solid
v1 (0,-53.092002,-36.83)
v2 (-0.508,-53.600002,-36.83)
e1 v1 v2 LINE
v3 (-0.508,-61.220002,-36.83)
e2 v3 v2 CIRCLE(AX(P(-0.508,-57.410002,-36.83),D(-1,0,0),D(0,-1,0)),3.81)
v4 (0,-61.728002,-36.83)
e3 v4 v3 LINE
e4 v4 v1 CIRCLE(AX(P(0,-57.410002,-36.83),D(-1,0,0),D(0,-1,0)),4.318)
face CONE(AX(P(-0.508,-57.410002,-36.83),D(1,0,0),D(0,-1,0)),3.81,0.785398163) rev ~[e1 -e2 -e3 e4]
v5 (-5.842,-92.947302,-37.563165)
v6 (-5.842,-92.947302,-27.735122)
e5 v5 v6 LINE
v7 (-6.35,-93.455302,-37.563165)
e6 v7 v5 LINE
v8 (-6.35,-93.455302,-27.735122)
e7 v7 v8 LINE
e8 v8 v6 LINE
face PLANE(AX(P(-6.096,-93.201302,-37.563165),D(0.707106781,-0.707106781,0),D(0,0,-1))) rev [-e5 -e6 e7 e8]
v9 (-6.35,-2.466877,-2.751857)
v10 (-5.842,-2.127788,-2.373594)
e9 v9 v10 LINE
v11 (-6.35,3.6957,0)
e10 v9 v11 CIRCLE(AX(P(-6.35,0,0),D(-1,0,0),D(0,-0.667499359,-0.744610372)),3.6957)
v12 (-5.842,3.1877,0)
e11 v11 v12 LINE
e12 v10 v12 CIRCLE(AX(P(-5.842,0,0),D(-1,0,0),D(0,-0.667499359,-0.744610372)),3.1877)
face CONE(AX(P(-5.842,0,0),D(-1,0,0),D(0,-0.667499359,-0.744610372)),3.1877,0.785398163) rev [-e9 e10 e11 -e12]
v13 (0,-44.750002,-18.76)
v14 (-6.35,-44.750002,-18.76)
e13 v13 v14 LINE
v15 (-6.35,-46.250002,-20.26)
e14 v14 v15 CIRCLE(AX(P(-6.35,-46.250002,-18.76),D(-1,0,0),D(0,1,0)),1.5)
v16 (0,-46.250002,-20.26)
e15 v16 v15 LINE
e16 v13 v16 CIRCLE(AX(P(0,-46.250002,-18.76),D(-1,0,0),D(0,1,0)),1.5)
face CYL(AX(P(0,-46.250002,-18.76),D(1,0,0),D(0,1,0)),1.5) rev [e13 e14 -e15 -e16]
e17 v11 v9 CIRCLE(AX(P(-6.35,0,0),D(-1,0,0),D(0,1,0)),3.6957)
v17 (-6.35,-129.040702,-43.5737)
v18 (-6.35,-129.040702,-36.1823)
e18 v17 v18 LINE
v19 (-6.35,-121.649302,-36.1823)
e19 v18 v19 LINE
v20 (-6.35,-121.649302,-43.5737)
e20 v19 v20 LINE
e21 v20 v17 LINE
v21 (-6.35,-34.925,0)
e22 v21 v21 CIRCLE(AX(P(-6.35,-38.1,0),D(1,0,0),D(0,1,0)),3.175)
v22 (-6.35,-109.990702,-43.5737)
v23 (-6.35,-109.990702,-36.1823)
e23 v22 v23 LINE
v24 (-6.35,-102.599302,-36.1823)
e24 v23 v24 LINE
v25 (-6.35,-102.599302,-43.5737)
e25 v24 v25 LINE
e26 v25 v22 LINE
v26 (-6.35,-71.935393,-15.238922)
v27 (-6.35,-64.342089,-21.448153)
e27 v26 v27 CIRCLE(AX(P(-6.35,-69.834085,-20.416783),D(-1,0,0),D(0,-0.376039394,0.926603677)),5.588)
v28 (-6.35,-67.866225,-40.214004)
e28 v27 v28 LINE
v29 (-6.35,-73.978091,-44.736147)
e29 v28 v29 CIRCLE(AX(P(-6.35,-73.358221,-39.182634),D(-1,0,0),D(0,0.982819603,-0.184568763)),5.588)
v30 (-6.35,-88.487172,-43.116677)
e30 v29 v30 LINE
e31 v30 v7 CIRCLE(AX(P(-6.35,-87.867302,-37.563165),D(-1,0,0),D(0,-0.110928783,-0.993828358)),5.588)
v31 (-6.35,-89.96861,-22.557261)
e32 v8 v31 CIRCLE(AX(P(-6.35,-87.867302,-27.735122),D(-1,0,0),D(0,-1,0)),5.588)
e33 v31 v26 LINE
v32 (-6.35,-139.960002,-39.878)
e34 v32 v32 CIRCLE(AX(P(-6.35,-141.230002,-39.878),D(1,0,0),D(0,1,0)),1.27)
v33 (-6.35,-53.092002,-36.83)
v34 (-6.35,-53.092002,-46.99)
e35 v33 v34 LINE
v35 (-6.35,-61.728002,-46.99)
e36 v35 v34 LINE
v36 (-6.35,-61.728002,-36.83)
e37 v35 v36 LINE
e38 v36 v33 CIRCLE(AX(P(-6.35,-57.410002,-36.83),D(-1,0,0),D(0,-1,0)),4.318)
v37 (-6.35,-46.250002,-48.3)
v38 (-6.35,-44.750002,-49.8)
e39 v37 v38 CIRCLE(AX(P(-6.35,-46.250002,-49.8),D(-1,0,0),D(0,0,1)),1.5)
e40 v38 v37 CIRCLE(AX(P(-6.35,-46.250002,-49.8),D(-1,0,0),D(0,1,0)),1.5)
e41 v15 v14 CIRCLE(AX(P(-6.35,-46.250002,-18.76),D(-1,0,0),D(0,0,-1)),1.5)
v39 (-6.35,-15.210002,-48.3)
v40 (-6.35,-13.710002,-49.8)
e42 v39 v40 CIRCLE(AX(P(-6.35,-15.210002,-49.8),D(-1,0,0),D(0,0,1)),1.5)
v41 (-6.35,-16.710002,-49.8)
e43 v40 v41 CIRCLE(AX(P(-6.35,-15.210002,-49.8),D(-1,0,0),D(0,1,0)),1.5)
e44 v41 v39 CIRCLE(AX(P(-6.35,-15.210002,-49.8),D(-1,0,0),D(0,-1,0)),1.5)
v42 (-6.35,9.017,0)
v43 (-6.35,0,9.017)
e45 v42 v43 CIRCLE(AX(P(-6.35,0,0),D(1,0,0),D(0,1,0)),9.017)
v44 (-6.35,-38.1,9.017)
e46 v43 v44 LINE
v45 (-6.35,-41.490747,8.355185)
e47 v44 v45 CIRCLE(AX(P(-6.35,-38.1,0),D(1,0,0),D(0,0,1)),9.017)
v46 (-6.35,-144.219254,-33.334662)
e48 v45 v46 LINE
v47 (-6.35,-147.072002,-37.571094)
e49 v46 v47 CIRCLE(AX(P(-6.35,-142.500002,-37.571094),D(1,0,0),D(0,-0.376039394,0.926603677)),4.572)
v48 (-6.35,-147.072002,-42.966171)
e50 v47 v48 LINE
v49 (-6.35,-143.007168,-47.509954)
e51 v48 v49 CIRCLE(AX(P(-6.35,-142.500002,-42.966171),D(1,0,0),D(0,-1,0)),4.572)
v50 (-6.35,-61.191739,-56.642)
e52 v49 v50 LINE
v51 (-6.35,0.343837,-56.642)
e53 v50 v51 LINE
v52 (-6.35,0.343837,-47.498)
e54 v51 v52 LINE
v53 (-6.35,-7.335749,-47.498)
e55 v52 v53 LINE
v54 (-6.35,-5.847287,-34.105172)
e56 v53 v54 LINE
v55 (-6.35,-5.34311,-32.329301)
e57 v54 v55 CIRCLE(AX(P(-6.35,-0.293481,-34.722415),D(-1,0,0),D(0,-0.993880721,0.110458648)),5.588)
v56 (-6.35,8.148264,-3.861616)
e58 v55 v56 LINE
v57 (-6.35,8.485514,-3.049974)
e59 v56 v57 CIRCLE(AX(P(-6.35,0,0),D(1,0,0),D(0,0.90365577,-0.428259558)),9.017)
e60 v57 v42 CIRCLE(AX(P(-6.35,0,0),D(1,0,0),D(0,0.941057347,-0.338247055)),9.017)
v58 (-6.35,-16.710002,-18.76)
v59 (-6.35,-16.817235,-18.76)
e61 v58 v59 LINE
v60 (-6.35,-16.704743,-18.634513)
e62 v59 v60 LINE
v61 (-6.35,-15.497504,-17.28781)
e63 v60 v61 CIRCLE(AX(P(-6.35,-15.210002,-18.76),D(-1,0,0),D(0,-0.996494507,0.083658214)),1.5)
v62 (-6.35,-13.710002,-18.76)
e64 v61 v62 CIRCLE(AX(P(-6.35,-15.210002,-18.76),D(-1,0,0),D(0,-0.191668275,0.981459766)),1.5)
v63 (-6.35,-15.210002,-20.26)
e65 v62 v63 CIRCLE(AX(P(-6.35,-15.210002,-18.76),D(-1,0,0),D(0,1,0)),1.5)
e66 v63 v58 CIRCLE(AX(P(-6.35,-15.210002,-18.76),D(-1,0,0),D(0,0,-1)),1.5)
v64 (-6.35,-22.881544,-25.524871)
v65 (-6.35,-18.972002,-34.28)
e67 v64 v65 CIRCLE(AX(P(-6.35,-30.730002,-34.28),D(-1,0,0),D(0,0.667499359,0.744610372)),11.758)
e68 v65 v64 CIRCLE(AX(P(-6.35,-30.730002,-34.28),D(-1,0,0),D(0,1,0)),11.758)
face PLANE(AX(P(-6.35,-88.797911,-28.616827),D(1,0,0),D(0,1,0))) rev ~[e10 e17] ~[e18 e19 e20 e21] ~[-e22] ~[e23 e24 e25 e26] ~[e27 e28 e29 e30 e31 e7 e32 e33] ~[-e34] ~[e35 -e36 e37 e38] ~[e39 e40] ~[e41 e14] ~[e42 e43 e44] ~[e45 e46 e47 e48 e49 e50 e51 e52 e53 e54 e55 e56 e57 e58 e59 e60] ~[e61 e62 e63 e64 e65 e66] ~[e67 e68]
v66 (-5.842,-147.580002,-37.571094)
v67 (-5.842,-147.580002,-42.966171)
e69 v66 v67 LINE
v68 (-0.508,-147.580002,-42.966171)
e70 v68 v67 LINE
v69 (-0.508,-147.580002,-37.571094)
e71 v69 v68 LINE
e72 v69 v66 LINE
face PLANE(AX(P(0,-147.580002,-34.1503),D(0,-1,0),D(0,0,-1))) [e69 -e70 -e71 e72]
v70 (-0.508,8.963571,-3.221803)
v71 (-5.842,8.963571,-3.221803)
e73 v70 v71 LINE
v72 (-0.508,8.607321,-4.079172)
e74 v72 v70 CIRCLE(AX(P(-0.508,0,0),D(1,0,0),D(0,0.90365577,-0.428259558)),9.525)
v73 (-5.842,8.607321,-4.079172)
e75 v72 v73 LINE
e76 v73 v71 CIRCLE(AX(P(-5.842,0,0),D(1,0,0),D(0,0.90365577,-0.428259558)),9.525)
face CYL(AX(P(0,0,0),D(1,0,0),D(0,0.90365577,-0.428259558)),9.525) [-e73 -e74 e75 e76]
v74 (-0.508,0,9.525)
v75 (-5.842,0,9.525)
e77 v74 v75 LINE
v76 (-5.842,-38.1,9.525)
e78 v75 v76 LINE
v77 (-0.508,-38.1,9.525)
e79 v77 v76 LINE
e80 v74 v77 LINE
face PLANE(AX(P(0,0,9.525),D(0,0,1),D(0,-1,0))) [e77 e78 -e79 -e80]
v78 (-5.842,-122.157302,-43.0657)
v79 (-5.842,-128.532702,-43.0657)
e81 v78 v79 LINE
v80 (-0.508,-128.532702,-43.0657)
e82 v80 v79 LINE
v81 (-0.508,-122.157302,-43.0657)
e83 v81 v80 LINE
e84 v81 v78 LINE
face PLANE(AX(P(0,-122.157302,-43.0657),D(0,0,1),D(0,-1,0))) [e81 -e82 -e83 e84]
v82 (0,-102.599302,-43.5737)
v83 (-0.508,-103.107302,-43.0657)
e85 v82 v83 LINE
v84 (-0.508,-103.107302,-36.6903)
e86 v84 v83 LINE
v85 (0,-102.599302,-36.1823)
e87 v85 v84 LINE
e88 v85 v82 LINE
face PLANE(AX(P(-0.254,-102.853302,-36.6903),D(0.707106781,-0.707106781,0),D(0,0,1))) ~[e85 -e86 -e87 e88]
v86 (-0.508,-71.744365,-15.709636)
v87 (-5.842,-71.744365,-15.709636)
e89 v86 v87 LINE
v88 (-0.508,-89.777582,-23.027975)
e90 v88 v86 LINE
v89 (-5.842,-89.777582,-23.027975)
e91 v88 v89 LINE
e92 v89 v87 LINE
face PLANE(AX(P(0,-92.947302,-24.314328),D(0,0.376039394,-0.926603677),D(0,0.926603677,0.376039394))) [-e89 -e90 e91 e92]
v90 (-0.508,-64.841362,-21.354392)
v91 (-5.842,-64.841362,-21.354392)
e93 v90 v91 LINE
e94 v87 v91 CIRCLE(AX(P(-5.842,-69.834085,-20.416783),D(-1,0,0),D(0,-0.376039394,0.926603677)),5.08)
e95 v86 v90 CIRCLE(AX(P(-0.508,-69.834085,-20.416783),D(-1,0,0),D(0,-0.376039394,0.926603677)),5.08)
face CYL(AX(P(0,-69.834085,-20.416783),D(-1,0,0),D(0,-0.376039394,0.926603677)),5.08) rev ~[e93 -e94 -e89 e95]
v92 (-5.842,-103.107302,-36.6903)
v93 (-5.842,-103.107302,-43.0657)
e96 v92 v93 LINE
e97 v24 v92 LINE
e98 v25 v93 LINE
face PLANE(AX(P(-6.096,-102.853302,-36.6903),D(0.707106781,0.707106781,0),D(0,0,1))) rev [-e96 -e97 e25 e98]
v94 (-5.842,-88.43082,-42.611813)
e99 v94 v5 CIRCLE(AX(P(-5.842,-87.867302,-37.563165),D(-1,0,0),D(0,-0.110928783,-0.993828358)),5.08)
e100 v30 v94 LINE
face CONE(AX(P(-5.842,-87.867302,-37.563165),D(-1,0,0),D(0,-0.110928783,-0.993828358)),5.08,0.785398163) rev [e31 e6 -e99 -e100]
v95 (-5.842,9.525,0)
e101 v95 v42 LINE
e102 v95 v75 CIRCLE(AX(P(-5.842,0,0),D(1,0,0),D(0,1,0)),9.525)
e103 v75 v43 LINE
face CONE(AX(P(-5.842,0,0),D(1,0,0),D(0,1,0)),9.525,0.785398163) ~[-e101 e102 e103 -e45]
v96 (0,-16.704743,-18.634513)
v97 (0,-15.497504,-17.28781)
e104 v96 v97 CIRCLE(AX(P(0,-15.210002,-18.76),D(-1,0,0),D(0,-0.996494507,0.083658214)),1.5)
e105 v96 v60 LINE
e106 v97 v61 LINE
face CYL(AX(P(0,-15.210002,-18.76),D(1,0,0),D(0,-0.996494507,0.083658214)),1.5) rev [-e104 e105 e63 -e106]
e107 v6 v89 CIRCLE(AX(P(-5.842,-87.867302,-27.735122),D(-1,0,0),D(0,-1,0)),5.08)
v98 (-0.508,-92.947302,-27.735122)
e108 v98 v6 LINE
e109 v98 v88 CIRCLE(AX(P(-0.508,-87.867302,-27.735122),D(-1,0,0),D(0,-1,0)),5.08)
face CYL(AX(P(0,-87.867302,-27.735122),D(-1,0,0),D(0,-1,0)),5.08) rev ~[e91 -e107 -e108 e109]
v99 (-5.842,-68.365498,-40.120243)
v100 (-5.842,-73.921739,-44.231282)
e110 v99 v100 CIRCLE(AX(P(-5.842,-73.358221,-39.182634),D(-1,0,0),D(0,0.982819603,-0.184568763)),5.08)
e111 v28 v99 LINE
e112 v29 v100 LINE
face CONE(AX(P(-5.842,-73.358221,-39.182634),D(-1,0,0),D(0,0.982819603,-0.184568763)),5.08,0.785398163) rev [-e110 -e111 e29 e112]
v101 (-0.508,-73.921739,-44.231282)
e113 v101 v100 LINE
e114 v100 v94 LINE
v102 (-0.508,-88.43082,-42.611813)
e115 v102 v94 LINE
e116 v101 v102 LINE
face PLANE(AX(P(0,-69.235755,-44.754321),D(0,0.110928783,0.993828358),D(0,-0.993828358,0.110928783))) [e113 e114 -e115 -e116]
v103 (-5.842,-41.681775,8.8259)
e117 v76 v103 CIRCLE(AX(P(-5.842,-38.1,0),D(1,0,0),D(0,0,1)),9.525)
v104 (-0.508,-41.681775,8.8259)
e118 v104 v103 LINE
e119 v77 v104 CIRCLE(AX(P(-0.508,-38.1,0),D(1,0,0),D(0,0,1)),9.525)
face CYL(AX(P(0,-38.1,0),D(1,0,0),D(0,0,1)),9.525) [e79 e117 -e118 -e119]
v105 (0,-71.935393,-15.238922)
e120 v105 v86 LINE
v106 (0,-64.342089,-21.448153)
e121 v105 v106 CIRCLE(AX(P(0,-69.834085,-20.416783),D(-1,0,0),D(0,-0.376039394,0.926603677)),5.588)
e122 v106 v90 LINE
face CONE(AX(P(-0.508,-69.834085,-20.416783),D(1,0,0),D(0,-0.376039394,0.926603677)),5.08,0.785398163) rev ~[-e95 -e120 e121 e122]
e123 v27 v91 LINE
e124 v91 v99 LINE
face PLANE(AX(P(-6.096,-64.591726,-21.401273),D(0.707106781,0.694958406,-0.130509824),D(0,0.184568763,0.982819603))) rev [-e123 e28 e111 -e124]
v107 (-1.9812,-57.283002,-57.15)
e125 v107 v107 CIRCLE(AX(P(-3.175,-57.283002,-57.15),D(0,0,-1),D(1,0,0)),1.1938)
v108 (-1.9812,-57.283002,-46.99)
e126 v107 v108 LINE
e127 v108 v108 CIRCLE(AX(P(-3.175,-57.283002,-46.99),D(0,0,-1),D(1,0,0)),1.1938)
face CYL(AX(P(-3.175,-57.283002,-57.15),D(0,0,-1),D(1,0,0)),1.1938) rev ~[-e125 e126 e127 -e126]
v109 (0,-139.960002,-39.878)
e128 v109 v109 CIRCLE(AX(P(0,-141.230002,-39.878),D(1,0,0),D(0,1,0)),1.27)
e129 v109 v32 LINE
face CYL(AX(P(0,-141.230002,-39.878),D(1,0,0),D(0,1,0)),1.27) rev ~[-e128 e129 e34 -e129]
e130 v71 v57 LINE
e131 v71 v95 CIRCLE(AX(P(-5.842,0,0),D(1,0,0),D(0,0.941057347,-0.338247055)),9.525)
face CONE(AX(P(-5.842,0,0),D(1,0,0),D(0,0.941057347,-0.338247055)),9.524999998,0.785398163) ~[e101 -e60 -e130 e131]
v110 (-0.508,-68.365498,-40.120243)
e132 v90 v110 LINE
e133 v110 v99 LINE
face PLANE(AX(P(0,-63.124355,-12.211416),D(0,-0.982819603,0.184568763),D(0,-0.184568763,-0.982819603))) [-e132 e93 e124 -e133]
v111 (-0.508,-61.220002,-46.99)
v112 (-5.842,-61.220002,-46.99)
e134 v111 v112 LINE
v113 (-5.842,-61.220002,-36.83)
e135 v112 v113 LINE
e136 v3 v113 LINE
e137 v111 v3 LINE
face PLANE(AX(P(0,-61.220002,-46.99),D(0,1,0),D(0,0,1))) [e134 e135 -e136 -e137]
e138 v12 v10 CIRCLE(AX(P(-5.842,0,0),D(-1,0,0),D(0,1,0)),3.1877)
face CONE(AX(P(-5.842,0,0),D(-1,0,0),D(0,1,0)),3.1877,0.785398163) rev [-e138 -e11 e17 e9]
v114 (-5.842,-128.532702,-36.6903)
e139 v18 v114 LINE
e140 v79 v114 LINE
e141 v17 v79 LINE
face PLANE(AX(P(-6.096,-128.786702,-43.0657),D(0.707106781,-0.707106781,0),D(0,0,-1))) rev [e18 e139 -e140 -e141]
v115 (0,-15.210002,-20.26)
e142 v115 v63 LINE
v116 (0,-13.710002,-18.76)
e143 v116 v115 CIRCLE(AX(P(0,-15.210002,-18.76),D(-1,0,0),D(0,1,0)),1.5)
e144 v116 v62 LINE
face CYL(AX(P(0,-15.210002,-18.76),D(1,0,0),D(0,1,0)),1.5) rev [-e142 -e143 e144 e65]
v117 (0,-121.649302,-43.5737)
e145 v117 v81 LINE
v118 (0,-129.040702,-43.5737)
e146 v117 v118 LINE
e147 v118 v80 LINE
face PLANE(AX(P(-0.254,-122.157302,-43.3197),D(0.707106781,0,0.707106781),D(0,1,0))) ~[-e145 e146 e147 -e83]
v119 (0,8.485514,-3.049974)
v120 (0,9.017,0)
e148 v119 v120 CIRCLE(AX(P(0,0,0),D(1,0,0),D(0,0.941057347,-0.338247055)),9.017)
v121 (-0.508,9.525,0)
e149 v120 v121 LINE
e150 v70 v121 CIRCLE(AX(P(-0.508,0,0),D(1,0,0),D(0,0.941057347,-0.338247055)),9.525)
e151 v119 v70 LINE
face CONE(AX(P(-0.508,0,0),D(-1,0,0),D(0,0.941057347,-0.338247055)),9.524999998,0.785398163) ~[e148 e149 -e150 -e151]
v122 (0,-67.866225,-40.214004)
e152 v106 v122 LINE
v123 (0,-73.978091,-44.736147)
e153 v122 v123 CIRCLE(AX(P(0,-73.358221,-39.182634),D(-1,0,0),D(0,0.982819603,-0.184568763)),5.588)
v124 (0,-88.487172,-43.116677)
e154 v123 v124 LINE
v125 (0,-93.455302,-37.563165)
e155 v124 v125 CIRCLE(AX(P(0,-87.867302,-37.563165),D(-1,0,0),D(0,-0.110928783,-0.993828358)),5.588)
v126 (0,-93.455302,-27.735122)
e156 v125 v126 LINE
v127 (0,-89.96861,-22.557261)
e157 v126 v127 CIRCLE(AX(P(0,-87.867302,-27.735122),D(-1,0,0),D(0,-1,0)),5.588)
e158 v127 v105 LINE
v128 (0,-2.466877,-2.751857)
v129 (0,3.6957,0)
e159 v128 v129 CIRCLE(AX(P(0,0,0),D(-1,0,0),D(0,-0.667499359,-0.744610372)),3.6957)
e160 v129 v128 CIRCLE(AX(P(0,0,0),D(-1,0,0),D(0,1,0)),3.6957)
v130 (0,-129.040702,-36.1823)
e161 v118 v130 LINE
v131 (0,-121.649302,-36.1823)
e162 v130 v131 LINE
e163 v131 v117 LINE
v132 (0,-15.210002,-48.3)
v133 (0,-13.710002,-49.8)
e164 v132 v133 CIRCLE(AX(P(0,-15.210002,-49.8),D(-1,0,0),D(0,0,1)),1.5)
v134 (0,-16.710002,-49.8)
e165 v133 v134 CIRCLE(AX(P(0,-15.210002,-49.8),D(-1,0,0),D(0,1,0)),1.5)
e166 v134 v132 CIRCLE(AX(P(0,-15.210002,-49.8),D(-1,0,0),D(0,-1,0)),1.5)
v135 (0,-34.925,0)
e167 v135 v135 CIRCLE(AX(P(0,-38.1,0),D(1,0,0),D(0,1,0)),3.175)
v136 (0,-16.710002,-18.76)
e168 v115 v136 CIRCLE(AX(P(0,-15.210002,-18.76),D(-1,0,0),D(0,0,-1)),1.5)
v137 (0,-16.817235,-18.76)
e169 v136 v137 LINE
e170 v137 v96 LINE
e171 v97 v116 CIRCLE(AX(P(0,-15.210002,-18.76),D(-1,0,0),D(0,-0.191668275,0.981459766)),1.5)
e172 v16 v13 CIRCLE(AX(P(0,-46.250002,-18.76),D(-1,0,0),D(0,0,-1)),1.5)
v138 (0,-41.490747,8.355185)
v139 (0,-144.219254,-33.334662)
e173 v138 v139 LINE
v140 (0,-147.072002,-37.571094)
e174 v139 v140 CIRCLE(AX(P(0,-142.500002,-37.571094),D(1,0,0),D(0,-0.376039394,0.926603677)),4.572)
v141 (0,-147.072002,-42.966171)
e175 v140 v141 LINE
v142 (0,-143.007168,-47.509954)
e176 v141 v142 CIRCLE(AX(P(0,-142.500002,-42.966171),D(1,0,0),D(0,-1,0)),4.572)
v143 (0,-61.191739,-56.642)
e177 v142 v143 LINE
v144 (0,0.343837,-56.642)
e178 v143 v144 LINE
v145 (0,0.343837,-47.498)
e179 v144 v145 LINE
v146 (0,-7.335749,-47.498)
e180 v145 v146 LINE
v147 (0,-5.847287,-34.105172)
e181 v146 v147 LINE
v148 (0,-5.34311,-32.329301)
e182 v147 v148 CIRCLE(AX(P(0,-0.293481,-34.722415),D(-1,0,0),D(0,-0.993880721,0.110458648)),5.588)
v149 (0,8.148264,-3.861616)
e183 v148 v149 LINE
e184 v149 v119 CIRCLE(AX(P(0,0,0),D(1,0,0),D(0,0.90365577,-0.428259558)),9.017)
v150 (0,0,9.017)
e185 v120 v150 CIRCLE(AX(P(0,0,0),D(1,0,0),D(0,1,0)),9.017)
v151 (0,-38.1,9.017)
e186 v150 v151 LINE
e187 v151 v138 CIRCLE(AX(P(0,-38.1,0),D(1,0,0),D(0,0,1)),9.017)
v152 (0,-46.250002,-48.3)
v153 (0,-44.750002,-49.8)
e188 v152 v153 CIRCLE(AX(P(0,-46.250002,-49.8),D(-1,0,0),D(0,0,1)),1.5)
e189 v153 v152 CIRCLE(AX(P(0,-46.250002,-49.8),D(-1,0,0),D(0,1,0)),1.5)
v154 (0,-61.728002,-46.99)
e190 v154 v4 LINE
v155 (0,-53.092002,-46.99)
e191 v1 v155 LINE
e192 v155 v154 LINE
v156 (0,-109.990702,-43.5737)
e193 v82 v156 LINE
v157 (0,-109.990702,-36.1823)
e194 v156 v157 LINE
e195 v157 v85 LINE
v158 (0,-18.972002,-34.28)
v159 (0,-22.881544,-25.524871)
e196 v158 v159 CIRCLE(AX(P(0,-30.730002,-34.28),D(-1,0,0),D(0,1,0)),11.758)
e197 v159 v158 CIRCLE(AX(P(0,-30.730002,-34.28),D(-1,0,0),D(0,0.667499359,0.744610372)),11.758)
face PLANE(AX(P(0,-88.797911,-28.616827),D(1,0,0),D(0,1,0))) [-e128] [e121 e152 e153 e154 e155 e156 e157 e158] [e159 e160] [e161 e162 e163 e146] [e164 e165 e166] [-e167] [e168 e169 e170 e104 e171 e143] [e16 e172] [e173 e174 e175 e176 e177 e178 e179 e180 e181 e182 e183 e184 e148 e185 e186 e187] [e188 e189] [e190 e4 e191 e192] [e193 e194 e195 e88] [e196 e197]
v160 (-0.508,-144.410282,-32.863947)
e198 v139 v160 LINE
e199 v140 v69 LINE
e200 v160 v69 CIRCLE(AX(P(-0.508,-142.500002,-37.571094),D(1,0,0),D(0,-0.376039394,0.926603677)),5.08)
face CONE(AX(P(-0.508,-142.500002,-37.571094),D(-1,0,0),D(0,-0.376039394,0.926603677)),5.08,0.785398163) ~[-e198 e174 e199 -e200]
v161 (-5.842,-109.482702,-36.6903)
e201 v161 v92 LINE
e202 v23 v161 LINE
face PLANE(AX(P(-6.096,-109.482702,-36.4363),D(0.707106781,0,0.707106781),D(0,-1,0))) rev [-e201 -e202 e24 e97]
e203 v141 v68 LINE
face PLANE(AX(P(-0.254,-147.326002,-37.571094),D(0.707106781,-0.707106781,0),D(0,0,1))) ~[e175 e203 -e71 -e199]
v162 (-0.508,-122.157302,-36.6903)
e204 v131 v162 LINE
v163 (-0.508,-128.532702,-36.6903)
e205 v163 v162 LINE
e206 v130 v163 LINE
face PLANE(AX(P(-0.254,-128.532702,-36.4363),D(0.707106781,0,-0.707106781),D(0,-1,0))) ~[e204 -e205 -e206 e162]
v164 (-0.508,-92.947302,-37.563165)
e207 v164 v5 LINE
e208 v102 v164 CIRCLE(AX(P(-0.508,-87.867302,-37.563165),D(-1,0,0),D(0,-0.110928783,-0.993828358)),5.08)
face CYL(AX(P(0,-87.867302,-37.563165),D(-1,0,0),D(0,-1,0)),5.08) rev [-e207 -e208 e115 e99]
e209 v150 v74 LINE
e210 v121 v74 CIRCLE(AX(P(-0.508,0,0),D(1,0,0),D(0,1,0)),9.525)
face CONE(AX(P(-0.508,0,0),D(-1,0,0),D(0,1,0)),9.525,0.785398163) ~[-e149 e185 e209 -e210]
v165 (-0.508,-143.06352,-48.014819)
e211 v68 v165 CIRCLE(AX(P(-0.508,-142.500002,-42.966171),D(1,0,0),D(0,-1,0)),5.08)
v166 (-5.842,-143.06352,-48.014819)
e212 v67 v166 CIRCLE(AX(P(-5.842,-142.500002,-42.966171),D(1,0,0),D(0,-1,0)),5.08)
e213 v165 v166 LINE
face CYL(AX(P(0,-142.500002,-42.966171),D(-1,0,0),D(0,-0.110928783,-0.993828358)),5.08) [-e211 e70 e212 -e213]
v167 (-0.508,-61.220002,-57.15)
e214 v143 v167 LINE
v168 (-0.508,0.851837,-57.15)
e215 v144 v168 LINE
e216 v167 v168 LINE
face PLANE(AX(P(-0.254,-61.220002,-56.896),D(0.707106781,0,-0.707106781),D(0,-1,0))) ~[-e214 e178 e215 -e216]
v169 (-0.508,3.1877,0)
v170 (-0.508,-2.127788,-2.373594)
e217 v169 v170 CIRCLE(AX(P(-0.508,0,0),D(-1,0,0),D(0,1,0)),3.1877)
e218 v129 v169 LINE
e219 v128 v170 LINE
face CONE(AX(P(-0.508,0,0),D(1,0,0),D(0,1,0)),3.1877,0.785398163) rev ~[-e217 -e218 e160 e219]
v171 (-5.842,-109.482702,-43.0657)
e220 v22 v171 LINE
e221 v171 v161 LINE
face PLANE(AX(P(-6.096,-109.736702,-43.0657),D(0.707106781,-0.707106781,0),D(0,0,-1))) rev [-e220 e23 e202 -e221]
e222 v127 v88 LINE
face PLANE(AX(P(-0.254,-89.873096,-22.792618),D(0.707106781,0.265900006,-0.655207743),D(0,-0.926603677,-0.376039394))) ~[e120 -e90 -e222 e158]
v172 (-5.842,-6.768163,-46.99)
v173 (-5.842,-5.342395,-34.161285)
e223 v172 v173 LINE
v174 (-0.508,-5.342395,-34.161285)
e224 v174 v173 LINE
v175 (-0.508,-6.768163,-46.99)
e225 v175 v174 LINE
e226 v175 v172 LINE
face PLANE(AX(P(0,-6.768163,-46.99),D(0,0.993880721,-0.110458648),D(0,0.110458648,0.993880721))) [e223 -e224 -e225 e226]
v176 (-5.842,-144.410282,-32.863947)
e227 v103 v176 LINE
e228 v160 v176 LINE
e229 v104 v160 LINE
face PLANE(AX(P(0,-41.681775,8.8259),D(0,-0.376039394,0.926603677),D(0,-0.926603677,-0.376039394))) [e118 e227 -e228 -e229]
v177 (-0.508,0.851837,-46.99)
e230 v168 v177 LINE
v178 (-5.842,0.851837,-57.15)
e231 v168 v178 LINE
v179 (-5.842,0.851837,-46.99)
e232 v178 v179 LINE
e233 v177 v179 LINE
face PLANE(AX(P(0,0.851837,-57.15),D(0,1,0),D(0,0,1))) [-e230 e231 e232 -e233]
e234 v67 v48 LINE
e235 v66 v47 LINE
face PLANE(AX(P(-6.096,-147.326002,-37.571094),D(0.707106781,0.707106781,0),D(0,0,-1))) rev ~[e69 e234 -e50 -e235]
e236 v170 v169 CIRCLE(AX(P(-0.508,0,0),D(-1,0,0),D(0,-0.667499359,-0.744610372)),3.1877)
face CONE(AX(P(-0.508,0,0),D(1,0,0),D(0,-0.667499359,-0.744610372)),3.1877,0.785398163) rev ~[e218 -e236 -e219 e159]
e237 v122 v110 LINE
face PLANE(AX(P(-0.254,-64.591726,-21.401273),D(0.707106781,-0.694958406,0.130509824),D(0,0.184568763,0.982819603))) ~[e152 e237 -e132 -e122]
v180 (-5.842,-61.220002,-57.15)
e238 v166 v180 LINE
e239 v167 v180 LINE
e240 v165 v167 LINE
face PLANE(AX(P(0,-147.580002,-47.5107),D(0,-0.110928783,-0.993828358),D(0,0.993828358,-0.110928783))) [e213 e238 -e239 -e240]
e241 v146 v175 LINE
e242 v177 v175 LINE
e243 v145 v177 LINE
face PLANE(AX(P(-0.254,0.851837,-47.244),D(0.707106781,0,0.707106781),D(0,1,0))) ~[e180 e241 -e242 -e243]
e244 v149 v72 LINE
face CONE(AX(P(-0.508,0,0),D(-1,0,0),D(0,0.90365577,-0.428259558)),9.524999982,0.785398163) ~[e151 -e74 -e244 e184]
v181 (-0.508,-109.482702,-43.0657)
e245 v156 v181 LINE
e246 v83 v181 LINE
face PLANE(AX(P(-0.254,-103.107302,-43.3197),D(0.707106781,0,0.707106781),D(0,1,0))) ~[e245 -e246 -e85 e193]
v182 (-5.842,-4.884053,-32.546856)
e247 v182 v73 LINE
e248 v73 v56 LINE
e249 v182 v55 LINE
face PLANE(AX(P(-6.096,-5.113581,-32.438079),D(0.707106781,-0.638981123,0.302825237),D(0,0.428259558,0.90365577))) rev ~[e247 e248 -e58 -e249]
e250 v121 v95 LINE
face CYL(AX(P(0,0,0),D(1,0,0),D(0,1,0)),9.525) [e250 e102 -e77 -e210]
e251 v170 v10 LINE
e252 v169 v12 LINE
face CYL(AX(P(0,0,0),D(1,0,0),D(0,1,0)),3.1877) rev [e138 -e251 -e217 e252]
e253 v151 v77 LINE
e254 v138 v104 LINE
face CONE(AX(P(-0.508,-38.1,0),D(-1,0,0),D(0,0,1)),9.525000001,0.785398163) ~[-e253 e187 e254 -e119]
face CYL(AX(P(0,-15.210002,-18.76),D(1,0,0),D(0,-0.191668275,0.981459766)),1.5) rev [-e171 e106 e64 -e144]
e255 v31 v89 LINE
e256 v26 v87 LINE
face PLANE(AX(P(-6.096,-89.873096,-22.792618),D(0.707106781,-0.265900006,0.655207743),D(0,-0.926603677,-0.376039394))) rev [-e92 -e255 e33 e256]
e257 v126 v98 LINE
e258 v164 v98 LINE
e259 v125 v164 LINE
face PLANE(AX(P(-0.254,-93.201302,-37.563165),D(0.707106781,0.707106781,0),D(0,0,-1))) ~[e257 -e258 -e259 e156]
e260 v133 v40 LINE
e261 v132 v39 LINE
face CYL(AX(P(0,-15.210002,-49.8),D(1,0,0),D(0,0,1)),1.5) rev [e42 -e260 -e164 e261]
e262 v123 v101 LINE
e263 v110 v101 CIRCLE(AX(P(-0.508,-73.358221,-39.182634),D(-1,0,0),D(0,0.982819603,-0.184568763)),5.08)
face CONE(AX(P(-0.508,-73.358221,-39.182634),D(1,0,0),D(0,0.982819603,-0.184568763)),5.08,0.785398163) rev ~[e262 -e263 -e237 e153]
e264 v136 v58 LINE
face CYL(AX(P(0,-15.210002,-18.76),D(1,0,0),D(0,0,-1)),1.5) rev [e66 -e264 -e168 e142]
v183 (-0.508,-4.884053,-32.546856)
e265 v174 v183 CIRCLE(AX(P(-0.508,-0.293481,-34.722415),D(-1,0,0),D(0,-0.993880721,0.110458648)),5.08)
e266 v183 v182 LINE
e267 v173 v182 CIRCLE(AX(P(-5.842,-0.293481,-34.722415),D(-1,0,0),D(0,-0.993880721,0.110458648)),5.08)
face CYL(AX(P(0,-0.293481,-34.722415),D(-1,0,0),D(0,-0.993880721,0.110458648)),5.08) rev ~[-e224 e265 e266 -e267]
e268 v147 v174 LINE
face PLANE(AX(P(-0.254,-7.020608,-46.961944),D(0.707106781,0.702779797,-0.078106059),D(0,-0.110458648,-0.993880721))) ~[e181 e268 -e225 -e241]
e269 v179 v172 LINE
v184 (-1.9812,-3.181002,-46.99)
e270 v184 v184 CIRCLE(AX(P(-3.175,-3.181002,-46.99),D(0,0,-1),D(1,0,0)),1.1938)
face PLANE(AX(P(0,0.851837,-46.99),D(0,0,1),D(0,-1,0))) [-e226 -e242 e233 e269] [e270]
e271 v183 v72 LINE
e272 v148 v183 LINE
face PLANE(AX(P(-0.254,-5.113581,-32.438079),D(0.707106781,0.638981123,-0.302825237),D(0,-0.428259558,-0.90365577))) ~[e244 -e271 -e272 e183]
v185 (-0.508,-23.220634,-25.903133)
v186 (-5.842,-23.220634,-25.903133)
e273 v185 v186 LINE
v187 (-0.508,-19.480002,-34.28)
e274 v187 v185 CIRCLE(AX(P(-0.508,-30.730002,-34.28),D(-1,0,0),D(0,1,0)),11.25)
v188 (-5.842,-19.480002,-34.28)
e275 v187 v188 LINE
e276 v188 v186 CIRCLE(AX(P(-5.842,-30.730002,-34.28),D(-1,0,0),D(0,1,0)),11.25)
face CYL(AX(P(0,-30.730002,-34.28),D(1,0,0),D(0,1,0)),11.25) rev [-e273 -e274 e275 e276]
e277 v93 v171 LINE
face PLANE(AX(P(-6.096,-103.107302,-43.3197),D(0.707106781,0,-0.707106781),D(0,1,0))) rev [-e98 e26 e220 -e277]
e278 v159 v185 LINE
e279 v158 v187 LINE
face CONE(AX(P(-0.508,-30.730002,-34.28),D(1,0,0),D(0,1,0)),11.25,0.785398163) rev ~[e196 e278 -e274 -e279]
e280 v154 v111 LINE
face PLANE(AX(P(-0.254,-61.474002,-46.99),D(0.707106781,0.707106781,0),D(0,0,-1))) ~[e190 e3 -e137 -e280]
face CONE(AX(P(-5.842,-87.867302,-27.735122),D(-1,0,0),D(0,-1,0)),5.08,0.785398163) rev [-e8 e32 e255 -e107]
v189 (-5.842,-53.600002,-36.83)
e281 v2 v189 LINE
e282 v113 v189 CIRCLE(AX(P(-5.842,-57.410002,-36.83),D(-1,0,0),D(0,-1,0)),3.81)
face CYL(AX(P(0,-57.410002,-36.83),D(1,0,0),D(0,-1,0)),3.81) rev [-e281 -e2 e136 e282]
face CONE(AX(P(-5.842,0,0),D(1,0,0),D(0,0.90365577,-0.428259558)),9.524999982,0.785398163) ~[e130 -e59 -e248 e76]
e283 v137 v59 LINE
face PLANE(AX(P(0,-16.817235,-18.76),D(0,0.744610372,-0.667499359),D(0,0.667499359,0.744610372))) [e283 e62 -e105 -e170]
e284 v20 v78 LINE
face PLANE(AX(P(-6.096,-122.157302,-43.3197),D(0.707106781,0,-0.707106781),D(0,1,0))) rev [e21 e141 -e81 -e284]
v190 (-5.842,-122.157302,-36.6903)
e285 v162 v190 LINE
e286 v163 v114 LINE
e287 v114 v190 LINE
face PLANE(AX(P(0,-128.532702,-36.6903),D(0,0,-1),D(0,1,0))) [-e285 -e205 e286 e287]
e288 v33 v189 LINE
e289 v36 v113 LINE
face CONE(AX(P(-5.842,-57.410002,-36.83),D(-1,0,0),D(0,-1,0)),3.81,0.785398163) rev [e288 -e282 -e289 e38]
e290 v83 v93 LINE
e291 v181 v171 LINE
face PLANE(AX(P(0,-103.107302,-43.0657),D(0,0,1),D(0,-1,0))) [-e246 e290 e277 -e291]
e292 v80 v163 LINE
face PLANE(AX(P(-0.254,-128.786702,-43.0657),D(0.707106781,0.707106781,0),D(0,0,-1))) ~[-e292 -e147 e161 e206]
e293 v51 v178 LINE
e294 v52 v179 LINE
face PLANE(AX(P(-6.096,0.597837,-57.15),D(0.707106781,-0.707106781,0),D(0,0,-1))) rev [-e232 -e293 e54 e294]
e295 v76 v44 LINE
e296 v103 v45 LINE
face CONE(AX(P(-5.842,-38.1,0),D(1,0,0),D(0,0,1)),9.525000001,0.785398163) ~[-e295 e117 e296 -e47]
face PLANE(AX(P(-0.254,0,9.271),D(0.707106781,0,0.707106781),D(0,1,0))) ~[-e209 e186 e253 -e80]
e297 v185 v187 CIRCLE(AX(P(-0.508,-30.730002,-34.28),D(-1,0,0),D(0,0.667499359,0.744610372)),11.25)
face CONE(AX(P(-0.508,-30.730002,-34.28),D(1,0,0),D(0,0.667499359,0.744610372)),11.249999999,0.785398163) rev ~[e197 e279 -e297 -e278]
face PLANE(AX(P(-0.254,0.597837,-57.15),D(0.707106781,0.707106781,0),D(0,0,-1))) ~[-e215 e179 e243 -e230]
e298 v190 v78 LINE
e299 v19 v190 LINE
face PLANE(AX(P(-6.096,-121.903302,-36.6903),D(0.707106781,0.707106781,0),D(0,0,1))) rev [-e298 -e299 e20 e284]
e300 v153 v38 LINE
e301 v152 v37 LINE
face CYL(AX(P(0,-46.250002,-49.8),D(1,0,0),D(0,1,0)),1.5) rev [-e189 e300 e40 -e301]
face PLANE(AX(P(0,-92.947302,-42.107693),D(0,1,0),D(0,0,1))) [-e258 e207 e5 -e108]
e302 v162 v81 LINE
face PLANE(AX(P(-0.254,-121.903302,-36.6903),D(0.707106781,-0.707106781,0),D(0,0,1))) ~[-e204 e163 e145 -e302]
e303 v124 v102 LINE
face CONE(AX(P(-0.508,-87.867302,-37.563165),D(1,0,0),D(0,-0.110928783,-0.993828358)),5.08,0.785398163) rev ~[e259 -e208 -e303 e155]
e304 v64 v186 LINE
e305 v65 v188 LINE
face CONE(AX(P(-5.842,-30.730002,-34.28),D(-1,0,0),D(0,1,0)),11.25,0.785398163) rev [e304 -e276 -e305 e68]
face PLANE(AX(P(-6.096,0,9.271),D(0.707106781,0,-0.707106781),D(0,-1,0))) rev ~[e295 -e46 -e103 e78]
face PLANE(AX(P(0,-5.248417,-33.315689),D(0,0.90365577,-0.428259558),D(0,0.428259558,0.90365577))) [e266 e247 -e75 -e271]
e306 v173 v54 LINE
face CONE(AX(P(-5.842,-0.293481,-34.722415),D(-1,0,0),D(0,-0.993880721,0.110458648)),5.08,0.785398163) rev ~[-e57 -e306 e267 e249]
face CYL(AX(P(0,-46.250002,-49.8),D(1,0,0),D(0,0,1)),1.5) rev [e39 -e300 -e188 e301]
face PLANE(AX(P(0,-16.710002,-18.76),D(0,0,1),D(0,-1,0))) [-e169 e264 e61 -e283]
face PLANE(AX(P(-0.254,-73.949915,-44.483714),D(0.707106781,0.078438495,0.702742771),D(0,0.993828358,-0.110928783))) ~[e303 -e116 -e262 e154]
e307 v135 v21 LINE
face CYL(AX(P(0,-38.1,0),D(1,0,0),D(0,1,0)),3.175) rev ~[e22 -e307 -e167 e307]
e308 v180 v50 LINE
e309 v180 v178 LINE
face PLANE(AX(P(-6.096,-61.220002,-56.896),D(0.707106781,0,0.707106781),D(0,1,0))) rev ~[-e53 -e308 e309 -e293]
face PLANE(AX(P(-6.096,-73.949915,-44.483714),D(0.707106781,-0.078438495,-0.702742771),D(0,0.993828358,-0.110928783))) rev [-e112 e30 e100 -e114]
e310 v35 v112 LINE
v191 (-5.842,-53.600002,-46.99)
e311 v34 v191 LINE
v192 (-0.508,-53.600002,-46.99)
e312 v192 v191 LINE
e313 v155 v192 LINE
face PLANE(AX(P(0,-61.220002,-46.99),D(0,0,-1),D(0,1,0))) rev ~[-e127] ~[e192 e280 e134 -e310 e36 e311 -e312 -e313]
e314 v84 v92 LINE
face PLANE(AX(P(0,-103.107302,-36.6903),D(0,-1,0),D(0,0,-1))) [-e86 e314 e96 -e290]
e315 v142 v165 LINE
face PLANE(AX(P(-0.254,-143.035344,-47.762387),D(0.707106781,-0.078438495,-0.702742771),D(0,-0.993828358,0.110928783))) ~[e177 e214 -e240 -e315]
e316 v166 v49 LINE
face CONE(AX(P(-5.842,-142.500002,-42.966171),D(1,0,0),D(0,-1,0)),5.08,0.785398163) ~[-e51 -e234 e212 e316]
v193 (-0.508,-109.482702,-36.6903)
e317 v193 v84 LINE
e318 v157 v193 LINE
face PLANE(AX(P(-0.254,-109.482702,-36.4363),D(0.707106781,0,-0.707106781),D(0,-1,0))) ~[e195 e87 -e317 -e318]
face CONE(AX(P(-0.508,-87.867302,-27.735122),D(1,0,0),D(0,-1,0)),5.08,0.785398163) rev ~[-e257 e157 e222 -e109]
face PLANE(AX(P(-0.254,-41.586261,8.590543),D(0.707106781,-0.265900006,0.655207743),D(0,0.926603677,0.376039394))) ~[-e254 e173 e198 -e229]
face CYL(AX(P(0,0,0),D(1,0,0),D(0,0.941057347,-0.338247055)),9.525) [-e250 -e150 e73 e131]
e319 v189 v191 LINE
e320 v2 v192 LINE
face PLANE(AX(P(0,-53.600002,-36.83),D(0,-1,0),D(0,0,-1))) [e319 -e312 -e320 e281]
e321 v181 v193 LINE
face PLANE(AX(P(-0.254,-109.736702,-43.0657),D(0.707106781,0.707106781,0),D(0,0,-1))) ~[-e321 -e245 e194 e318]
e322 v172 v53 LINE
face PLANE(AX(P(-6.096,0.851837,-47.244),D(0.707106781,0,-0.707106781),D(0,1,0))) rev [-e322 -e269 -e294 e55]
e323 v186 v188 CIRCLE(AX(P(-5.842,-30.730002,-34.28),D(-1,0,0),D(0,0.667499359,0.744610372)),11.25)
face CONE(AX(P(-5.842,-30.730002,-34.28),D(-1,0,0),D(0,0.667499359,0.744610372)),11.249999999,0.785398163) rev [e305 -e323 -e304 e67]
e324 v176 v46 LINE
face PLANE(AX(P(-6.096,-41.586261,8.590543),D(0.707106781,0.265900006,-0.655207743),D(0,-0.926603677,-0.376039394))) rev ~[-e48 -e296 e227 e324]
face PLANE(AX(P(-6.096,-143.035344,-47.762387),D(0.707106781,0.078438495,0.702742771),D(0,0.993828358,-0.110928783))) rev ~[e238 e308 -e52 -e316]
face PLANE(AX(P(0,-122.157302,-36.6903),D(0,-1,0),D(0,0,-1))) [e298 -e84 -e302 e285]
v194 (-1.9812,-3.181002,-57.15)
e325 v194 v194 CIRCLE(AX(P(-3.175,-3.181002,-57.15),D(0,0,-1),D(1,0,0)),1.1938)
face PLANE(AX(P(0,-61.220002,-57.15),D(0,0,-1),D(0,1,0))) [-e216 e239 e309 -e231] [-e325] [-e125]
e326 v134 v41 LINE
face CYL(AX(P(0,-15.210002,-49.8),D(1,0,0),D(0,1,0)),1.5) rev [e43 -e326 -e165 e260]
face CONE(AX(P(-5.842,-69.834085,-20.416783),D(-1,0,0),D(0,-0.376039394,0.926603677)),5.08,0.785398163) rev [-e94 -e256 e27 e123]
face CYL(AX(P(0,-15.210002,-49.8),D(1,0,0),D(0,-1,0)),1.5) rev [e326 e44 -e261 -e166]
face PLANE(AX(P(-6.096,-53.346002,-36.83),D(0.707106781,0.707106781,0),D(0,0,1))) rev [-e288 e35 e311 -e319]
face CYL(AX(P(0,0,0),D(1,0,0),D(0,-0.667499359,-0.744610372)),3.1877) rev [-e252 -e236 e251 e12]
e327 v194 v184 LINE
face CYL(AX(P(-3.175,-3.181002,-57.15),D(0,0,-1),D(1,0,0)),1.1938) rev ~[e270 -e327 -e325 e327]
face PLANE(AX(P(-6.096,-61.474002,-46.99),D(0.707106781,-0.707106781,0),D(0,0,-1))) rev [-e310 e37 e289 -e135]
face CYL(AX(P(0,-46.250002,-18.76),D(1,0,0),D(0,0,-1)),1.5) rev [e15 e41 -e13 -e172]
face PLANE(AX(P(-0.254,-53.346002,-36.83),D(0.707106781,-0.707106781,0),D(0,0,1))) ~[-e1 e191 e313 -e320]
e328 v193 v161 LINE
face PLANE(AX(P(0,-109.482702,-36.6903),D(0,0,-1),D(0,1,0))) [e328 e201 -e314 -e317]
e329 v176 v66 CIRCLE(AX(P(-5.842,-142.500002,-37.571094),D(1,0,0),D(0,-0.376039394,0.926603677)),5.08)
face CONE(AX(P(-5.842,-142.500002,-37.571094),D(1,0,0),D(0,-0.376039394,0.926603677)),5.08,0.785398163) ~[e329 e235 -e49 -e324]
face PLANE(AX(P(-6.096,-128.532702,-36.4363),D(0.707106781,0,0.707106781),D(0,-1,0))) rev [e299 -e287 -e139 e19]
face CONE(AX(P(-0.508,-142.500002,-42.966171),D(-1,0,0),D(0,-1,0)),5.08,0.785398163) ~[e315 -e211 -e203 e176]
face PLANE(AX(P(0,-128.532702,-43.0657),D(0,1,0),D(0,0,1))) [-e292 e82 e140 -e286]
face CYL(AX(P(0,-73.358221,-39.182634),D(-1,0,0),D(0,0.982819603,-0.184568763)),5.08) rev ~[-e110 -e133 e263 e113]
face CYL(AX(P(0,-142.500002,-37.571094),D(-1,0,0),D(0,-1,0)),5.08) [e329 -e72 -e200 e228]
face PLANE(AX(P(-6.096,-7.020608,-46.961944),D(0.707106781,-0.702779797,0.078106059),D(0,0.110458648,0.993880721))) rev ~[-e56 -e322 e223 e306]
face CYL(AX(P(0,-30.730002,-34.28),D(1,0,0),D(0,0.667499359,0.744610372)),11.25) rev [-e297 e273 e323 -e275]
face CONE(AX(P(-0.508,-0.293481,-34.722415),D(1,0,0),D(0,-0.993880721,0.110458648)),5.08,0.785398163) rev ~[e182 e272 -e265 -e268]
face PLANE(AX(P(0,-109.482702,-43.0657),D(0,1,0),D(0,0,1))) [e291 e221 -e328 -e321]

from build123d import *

# Parameters (mm, degrees)
F0_R     = 1.27
F0_R_2   = 3.175
F0_W     = 7.62
F0_H     = 10.16
F1_DEPTH = 6.35
F2_R     = 1.1938
F3_DEPTH = 10.16
F4_R     = 5.08
F5_SIZE  = 0.508


# Not quite as in the source:
# - a feature names something its author has since deleted; it is built from what else it names


with BuildPart() as f1:
    # F0 (on Right) → F1 (new body)
    with BuildSketch(Plane.YZ):
        with BuildLine():
            ThreePointArc((-44.8351920908, 6.7351920908), (-43.3633372108, 7.93869677), (-41.6817752313, 8.8259000217))
            Line((-41.6817752313, 8.8259000217), (-147.5800017288, -34.1503))
            Line((-147.5800017288, -34.1503), (-147.5800017288, -47.5107))
            Line((-147.5800017288, -47.5107), (-61.2200017288, -57.15))
            Line((-61.2200017288, -57.15), (-61.2200017288, -46.99))
            Line((-61.2200017288, -46.99), (-61.2200017288, -36.83))
            ThreePointArc((-61.2200017288, -36.83), (-57.4100017288, -33.02), (-53.6000017288, -36.83))
            Line((-53.6000017288, -36.83), (-53.6000017288, -2.0296175472))
            Line((-53.6000017288, -2.0296175472), (-44.8351920908, 6.7351920908))
        make_face()
        with Locations((-141.2300017288, -39.878)):
            Circle(F0_R, mode=Mode.SUBTRACT)
        Polygon((-122.1573017288, -36.6903), (-122.1573017288, -39.878), (-122.1573017288, -43.0657), (-128.5327017288, -43.0657), (-128.5327017288, -36.6903), align=None, mode=Mode.SUBTRACT)
        Polygon((-109.4827017288, -36.6903), (-103.1073017288, -36.6903), (-103.1073017288, -43.0657), (-109.4827017288, -43.0657), (-109.4827017288, -39.878), align=None, mode=Mode.SUBTRACT)
        Polygon((-92.9473017288, -24.3143284318), (-63.1243550698, -12.2114163884), (-69.2357549062, -44.7543205599), (-92.9473017288, -42.1076934955), align=None, mode=Mode.SUBTRACT)
        Polygon((-9.1300017288, -12.68), (-11.3668734516, -12.68), (-49.291932274, -12.68), (-52.3300017288, -36.875562325), (-52.3300017288, -55.88), (-9.963521833, -55.88), (-9.1300017288, -53.5610139018), align=None)
        with BuildLine():
            ThreePointArc((-16.7047434898, -18.6345126787), (-16.3269172867, -17.7587509619), (-15.4975041416, -17.287810351))
            ThreePointArc((-15.4975041416, -17.287810351), (-14.2563911214, -17.6021456009), (-13.7100017288, -18.76))
            ThreePointArc((-13.7100017288, -18.76), (-14.149341557, -19.8206601718), (-15.2100017288, -20.26))
            Line((-15.2100017288, -20.26), (-15.2100017288, -48.3))
            ThreePointArc((-15.2100017288, -48.3), (-14.149341557, -48.7393398282), (-13.7100017288, -49.8))
            ThreePointArc((-13.7100017288, -49.8), (-15.2100017288, -51.3), (-16.7100017288, -49.8))
            Line((-16.7100017288, -49.8), (-44.7500017288, -49.8))
            ThreePointArc((-44.7500017288, -49.8), (-47.3106619005, -50.8606601718), (-46.2500017288, -48.3))
            Line((-46.2500017288, -48.3), (-46.2500017288, -20.26))
            ThreePointArc((-46.2500017288, -20.26), (-47.3106619005, -17.6993398282), (-44.7500017288, -18.76))
            Line((-44.7500017288, -18.76), (-16.8172354852, -18.76))
            Line((-16.8172354852, -18.76), (-16.7047434898, -18.6345126787))
        make_face(mode=Mode.SUBTRACT)
        with BuildLine():
            Line((-16.7100017288, -18.76), (-16.8172354852, -18.76))
            Line((-16.8172354852, -18.76), (-44.7500017288, -18.76))
            ThreePointArc((-44.7500017288, -18.76), (-45.189341557, -19.8206601718), (-46.2500017288, -20.26))
            Line((-46.2500017288, -20.26), (-46.2500017288, -48.3))
            ThreePointArc((-46.2500017288, -48.3), (-45.189341557, -48.7393398282), (-44.7500017288, -49.8))
            Line((-44.7500017288, -49.8), (-16.7100017288, -49.8))
            ThreePointArc((-16.7100017288, -49.8), (-16.2706619005, -48.7393398282), (-15.2100017288, -48.3))
            Line((-15.2100017288, -48.3), (-15.2100017288, -20.26))
            ThreePointArc((-15.2100017288, -20.26), (-16.2706619005, -19.8206601718), (-16.7100017288, -18.76))
        make_face()
        with BuildLine():
            ThreePointArc((-19.4800017288, -34.28), (-41.0023648355, -38.8670531067), (-23.2206339428, -25.9031333152))
            ThreePointArc((-23.2206339428, -25.9031333152), (-20.457638622, -29.6929468933), (-19.4800017288, -34.28))
        make_face(mode=Mode.SUBTRACT)
        with BuildLine():
            Line((-11.3668734516, -12.68), (-6.3579313922, -7.0924137931))
            ThreePointArc((-6.3579313922, -7.0924137931), (-8.8960908937, 3.4037026619), (0, 9.525))
            Line((0, 9.525), (-38.1, 9.525))
            ThreePointArc((-38.1, 9.525), (-31.3648079092, 6.7351920908), (-28.575, 0))
            ThreePointArc((-28.575, 0), (-38.6944942594, -9.5064294862), (-47.5507903571, 1.1866703952))
            Line((-47.5507903571, 1.1866703952), (-49.291932274, -12.68))
            Line((-49.291932274, -12.68), (-11.3668734516, -12.68))
        make_face()
        with BuildLine():
            ThreePointArc((8.6073212119, -4.0791722879), (1.8801182762, -9.3376003485), (-6.3579313922, -7.0924137931))
            Line((-6.3579313922, -7.0924137931), (-11.3668734516, -12.68))
            Line((-11.3668734516, -12.68), (-9.1300017288, -12.68))
            Line((-9.1300017288, -12.68), (-9.1300017288, -53.5610139018))
            Line((-9.1300017288, -53.5610139018), (-6.7681625627, -46.99))
            Line((-6.7681625627, -46.99), (-5.248416905, -33.3156889593))
            Line((-5.248416905, -33.3156889593), (8.6073212119, -4.0791722879))
        make_face()
        with BuildLine():
            ThreePointArc((-28.575, 0), (-31.3648079092, 6.7351920908), (-38.1, 9.525))
            ThreePointArc((-38.1, 9.525), (-39.9246817933, 9.3485914101), (-41.6817752313, 8.8259000217))
            ThreePointArc((-41.6817752313, 8.8259000217), (-43.3633372108, 7.93869677), (-44.8351920908, 6.7351920908))
            ThreePointArc((-44.8351920908, 6.7351920908), (-46.6552925258, 4.1871941438), (-47.5507903571, 1.1866703952))
            ThreePointArc((-47.5507903571, 1.1866703952), (-38.6944942594, -9.5064294862), (-28.575, 0))
        make_face()
        with Locations((-38.1, 0)):
            Circle(F0_R_2, mode=Mode.SUBTRACT)
        with BuildLine():
            ThreePointArc((0, 9.525), (-8.8960908937, 3.4037026619), (-6.3579313922, -7.0924137931))
            ThreePointArc((-6.3579313922, -7.0924137931), (1.8801182762, -9.3376003485), (8.6073212119, -4.0791722879))
            ThreePointArc((8.6073212119, -4.0791722879), (8.7958988014, -3.6548309503), (8.9635712281, -3.2218031967))
            ThreePointArc((8.9635712281, -3.2218031967), (9.3835931537, -1.6351772155), (9.525, 0))
            ThreePointArc((9.525, 0), (6.7351920908, 6.7351920908), (0, 9.525))
        make_face()
        with BuildLine():
            ThreePointArc((-2.1277877059, -2.3735944828), (-1.2997465945, 2.9106855), (3.1877, 0))
            ThreePointArc((3.1877, 0), (1.2997465945, -2.9106855), (-2.1277877059, -2.3735944828))
        make_face(mode=Mode.SUBTRACT)
        with BuildLine():
            Line((-52.3300017288, -12.68), (-49.291932274, -12.68))
            Line((-49.291932274, -12.68), (-47.5507903571, 1.1866703952))
            ThreePointArc((-47.5507903571, 1.1866703952), (-46.6552925258, 4.1871941438), (-44.8351920908, 6.7351920908))
            Line((-44.8351920908, 6.7351920908), (-53.6000017288, -2.0296175472))
            Line((-53.6000017288, -2.0296175472), (-53.6000017288, -36.83))
            Line((-53.6000017288, -36.83), (-53.6000017288, -46.99))
            Line((-53.6000017288, -46.99), (-52.3300017288, -36.875562325))
            Line((-52.3300017288, -36.875562325), (-52.3300017288, -12.68))
        make_face()
        Polygon((0.8518374373, -46.99), (-6.7681625627, -46.99), (-9.1300017288, -53.5610139018), (-9.1300017288, -55.88), (-9.963521833, -55.88), (-10.4200017288, -57.15), (0.8518374373, -57.15), align=None)
        with Locations((-57.4100017288, -52.07)):
            Rectangle(F0_W, F0_H)
        Polygon((-52.3300017288, -55.88), (-52.3300017288, -36.875562325), (-53.6000017288, -46.99), (-53.6000017288, -57.15), (-10.4200017288, -57.15), (-9.963521833, -55.88), align=None)
        Polygon((-52.3300017288, -36.875562325), (-49.291932274, -12.68), (-52.3300017288, -12.68), align=None)
        Polygon((-9.1300017288, -55.88), (-9.1300017288, -53.5610139018), (-9.963521833, -55.88), align=None)
    extrude(amount=-F1_DEPTH)

    # F2 (on face) → F3 (cut, through all)
    with BuildSketch(Plane(origin=(0, 0, -57.15), x_dir=(1, 0, 0), z_dir=(0, 0, -1))):
        with Locations((-3.175, 57.2830017288)):
            Circle(F2_R)
        with Locations((-3.175, 3.1810017288)):
            Circle(F2_R)
    extrude(amount=-F3_DEPTH, mode=Mode.SUBTRACT)

    # F4
    f4_edges = [f1.edges().sort_by_distance(p)[0] for p in [
        (-3.175, -147.580002, -34.1503),
        (-3.175, -147.580002, -47.5107),
        (-3.175, -69.235755, -44.754321),
        (-3.175, -92.947302, -42.107693),
        (-3.175, -92.947302, -24.314328),
        (-3.175, -63.124355, -12.211416),
        (-3.175, -5.248417, -33.315689),
    ]]
    fillet(f4_edges, radius=F4_R)

    # F5
    f5_edges = [f1.edges().sort_by_distance(p)[0] for p in [
        (0, -93.046029, -12.019023),
        (0, -30.184082, -57.15),
        (0, 0.851837, -52.07),
        (-6.35, 0.851837, -52.07),
        (-6.35, -30.184082, -57.15),
        (-6.35, -102.141761, -52.58241),
        (0, -81.17628, -43.421547),
        (-6.35, -106.295002, -36.6903),
        (-6.35, -103.107302, -39.878),
        (-6.35, -106.295002, -43.0657),
        (-6.35, -109.482702, -39.878),
        (-6.35, -122.157302, -39.878),
        (-6.35, -125.345002, -43.0657),
        (-6.35, -128.532702, -39.878),
        (-6.35, -125.345002, -36.6903),
        (0, -125.345002, -36.6903),
        (0, -128.532702, -39.878),
        (0, -125.345002, -43.0657),
        (0, -122.157302, -39.878),
        (0, -106.295002, -43.0657),
        (0, -109.482702, -39.878),
        (0, -106.295002, -36.6903),
        (0, -103.107302, -39.878),
        (0, -61.220002, -41.91),
        (-6.35, -61.220002, -41.91),
        (-3.175, -23.220634, -25.903133),
        (0, -38.23937, -42.656867),
        (-6.35, -38.23937, -42.656867),
        (-6.35, -2.958163, -46.99),
        (0, -2.958163, -46.99),
        (-6.35, -81.17628, -43.421547),
        (-3.175, -2.127788, -2.373594),
        (0, 2.127788, 2.373594),
        (-6.35, 2.127788, 2.373594),
        (0, 1.861634, -18.313014),
        (-6.35, 1.861634, -18.313014),
        (0, -146.713707, -34.73365),
        (0, -39.924682, 9.348591),
        (0, -147.580002, -40.268632),
        (0, -19.05, 9.525),
        (0, -146.286099, -46.353185),
        (0, 8.049216, 5.092716),
        (0, -102.141761, -52.58241),
        (0, -5.180353, -33.335013),
        (0, -6.055279, -40.575643),
        (0, -57.410002, -33.02),
        (0, -53.600002, -41.91),
        (0, -66.60343, -30.737318),
        (0, -66.618314, -16.484199),
        (0, -70.336694, -43.266355),
        (0, -80.760974, -19.368806),
        (0, -92.081007, -24.897678),
        (0, -91.653399, -40.950178),
        (0, -92.947302, -32.649143),
        (-6.35, -5.180353, -33.335013),
        (-6.35, 8.049216, 5.092716),
        (-6.35, -93.046029, -12.019023),
        (-6.35, -146.713707, -34.73365),
        (-6.35, -39.924682, 9.348591),
        (-6.35, -147.580002, -40.268632),
        (-6.35, -19.05, 9.525),
        (-6.35, -146.286099, -46.353185),
        (-6.35, -6.055279, -40.575643),
        (-6.35, -57.410002, -33.02),
        (-6.35, -53.600002, -41.91),
        (-6.35, -66.60343, -30.737318),
        (-6.35, -66.618314, -16.484199),
        (-6.35, -70.336694, -43.266355),
        (-6.35, -80.760974, -19.368806),
        (-6.35, -92.081007, -24.897678),
        (-6.35, -91.653399, -40.950178),
        (-6.35, -92.947302, -32.649143),
    ]]
    chamfer(f5_edges, length=F5_SIZE)


solid = f1.part
